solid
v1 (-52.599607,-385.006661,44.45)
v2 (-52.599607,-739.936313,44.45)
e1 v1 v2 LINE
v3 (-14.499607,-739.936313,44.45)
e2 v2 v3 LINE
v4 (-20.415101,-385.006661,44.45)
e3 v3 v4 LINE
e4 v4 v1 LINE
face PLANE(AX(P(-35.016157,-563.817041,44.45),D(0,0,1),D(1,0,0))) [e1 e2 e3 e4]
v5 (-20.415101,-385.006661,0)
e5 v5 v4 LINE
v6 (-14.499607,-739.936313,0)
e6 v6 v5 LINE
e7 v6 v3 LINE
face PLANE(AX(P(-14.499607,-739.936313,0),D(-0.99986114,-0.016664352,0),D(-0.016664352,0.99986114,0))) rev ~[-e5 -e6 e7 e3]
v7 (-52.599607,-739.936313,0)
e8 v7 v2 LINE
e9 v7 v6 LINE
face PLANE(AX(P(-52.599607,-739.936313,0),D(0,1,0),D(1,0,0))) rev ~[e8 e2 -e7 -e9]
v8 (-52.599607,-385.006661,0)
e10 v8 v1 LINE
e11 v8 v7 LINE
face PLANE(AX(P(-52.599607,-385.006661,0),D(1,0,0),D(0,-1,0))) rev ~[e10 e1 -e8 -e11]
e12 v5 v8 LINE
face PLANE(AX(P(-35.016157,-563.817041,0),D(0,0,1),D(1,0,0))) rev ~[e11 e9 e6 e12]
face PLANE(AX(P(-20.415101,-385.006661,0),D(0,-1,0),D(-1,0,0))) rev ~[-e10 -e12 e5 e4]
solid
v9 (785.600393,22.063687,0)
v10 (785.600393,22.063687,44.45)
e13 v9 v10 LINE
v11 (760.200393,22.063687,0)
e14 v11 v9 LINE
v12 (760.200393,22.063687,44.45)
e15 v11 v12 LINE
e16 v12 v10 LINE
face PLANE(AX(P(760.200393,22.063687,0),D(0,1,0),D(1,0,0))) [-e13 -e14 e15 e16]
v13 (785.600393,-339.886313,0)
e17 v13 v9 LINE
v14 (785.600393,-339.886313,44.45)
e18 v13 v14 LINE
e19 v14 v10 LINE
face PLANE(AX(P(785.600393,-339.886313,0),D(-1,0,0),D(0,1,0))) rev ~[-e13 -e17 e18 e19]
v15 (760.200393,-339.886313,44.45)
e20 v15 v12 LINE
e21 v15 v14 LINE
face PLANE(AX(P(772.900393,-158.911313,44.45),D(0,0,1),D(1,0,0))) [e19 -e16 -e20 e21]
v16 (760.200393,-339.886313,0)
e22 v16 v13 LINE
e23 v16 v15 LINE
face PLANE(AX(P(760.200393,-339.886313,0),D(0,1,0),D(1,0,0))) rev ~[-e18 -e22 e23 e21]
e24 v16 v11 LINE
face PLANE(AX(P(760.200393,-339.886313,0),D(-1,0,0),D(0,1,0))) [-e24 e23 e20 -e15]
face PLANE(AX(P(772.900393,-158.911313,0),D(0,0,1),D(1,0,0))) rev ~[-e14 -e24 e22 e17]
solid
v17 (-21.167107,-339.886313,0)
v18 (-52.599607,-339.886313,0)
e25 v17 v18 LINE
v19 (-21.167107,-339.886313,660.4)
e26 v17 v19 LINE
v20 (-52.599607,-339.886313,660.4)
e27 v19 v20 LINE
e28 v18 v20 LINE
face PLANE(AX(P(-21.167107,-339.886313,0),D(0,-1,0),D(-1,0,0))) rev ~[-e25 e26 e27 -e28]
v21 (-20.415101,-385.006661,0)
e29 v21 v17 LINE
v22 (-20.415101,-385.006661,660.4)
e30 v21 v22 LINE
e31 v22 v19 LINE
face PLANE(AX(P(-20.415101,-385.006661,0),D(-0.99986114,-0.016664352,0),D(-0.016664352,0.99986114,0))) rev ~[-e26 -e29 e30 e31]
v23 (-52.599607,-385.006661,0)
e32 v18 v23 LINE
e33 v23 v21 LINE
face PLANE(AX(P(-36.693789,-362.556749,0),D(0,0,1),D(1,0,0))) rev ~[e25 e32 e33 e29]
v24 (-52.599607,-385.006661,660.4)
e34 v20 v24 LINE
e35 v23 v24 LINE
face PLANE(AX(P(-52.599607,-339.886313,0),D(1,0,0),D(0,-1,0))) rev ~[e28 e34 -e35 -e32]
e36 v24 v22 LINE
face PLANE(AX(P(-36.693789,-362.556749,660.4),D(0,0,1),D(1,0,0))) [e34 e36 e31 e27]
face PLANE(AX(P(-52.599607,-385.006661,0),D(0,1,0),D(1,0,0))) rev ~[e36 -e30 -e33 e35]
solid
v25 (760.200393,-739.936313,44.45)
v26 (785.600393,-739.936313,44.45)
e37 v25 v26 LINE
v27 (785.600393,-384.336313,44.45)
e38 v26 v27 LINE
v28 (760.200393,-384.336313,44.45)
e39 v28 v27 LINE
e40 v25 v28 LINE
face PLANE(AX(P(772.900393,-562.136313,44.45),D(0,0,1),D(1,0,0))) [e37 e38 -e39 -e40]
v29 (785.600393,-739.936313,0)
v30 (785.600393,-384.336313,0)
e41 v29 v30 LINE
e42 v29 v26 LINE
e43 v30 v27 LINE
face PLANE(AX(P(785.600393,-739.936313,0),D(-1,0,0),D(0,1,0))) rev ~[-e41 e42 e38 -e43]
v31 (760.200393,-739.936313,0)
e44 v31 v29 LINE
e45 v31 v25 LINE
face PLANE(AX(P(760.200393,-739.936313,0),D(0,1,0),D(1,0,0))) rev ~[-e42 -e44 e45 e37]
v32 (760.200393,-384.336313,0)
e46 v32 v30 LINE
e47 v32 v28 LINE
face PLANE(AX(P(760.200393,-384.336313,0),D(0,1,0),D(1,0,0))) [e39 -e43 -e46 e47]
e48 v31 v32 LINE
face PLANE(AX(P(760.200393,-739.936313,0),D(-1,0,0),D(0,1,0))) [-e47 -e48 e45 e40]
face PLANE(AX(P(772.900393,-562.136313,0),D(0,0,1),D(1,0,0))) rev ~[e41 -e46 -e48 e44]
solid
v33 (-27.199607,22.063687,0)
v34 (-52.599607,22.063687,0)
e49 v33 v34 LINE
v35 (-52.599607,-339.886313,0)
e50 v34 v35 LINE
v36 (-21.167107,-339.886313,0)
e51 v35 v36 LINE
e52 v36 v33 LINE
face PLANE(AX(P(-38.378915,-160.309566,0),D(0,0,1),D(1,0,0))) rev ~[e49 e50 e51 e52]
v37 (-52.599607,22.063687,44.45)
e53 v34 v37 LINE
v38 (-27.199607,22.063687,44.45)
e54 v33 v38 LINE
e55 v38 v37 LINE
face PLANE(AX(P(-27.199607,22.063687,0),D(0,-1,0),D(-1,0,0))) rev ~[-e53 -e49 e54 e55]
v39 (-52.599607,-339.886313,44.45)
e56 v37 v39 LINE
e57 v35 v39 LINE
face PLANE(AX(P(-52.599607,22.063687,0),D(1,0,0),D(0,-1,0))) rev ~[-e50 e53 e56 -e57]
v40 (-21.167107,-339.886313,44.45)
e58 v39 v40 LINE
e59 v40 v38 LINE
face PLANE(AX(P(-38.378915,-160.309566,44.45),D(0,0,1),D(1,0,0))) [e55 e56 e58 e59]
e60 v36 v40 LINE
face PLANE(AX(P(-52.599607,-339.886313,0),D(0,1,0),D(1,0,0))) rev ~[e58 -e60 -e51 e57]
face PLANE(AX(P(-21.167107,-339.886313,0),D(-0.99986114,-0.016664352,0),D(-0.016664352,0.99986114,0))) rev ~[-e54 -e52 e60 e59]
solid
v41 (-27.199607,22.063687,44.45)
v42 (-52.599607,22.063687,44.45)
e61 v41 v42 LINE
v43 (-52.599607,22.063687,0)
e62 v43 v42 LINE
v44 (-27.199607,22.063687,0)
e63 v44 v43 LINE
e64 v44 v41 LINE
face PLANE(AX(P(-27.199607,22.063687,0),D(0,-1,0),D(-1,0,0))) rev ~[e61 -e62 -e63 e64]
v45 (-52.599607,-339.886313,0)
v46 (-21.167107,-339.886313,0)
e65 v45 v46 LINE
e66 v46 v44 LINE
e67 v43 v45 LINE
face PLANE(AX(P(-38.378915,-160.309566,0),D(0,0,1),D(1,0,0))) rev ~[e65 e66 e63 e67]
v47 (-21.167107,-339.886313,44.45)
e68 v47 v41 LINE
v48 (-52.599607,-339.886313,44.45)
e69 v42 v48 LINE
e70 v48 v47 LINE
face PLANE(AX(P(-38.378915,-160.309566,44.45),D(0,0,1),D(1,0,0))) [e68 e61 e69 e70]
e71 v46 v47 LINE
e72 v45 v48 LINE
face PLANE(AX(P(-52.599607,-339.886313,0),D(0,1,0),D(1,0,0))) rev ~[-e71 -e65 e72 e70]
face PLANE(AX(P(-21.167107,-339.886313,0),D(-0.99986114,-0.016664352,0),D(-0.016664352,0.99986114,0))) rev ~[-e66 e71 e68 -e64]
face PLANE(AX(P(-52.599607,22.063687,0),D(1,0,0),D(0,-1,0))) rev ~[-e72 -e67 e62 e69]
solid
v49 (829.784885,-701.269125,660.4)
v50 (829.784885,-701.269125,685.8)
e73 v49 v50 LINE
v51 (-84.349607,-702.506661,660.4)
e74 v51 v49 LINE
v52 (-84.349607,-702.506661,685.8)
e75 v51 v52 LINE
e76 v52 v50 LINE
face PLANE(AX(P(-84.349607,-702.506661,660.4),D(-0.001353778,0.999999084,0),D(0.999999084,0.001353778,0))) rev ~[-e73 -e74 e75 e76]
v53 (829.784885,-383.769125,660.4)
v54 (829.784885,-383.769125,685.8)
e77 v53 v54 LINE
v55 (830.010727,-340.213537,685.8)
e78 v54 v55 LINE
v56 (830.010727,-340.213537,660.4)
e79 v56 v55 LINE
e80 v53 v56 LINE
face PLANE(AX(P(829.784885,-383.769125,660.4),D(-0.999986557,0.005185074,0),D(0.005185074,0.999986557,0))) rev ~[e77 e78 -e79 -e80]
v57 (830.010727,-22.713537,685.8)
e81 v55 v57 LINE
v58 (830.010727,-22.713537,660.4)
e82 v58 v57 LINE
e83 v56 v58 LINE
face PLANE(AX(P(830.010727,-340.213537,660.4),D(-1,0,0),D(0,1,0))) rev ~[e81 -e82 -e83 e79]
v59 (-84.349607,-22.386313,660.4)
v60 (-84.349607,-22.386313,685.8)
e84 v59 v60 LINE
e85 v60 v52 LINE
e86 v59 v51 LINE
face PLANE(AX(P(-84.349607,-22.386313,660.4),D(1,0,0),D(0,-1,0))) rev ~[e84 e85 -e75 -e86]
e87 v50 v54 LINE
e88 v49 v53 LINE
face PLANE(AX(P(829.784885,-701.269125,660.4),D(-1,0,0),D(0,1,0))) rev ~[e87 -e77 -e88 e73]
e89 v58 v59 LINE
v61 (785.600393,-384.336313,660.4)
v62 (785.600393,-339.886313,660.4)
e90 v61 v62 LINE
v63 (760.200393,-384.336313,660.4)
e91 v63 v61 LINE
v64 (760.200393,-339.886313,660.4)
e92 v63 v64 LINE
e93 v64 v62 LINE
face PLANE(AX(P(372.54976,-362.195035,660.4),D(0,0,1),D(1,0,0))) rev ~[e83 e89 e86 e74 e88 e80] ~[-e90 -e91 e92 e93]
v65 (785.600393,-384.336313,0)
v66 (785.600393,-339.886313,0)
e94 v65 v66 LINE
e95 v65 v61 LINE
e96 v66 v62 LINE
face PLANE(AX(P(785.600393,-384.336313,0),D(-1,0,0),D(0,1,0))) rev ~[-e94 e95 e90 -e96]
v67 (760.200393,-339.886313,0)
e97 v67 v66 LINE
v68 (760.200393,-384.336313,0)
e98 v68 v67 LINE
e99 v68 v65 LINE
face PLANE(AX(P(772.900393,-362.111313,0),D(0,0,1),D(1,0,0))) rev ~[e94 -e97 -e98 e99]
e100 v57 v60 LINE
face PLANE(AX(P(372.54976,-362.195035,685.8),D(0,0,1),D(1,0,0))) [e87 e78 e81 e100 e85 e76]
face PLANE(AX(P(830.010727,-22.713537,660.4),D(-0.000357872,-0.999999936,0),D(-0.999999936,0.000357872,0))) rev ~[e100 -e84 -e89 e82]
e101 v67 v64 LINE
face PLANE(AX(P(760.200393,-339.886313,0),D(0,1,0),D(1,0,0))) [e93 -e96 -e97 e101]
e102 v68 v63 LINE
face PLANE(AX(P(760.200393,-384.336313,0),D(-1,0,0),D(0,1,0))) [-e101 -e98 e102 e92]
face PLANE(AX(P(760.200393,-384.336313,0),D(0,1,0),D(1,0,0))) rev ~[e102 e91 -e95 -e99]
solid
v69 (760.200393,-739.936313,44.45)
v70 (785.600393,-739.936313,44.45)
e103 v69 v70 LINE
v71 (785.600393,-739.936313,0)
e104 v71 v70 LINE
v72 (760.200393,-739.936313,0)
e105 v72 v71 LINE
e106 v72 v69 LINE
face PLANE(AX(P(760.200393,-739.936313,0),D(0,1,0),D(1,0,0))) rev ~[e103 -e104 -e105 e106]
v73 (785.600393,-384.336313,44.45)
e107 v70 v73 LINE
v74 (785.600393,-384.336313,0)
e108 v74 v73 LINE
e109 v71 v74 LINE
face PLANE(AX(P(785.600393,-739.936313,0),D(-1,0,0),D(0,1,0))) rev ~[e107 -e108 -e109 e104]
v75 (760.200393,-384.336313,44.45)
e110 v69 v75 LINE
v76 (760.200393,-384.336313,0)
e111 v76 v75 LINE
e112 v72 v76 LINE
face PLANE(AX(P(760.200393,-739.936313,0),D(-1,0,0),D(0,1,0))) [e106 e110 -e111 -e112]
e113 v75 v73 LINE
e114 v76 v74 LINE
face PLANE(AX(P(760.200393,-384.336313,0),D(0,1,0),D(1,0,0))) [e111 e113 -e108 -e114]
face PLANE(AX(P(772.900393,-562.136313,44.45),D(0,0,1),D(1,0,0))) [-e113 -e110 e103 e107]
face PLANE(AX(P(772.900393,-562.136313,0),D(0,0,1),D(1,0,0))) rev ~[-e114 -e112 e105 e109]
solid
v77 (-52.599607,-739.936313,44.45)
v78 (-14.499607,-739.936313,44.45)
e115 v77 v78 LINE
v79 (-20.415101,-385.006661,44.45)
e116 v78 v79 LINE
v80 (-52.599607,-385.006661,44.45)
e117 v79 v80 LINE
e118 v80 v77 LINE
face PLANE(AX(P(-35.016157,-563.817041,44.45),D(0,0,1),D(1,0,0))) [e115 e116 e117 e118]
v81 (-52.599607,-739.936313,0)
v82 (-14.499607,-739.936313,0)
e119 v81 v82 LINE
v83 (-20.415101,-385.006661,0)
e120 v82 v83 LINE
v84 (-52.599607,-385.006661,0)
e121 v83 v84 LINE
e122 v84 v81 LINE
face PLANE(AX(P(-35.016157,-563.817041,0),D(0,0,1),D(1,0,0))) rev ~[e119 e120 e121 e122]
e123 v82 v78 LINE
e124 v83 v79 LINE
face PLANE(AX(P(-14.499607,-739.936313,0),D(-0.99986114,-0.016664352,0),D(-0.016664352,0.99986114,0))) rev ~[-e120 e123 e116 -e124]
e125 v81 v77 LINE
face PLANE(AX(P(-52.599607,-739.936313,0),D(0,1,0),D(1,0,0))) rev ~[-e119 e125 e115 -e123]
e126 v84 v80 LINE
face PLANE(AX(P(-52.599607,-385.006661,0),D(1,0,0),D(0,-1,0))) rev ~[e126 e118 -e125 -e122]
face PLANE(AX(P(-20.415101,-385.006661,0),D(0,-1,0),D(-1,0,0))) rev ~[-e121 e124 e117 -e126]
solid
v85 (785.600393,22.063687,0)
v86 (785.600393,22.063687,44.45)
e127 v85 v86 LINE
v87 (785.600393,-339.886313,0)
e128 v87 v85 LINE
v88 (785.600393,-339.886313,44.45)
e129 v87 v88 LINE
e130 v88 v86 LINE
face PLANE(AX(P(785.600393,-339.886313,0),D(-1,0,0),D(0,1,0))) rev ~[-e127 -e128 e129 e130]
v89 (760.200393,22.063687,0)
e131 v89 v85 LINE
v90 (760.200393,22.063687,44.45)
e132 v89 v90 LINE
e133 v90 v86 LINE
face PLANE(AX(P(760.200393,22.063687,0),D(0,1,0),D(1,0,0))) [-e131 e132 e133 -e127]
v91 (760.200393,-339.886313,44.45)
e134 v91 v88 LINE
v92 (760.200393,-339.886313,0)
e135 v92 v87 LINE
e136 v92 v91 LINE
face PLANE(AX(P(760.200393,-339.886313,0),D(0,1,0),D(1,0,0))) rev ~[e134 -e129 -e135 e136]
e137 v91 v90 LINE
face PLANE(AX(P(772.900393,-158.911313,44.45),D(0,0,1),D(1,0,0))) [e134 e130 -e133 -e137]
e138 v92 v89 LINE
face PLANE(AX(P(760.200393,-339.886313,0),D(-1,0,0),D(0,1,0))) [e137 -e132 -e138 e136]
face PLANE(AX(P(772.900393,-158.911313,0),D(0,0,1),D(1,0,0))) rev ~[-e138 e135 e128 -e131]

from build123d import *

# Parameters (mm, degrees)
F1_DEPTH = 44.45
F0_W     = 25.4
F0_H     = 355.6
F0_H_2   = 361.95
F2_DEPTH = 660.4
F0_H_3   = 44.45
F3_DEPTH = 44.45
F5_DEPTH = 25.4


with BuildPart() as f1:
    # F0 (on Top) → F1 (new body)
    with BuildSketch(Plane.XY):
        Polygon((-20.4151007465, -385.0066614151), (-52.5996065524, -385.0066614151), (-52.5996065524, -739.9363130581), (-14.4996065524, -739.9363130581), align=None)
    extrude(amount=F1_DEPTH)


with BuildPart() as f1b:
    # F0 (on Top) → F1, piece 2 (new body)
    with BuildSketch(Plane.XY):
        with Locations((772.9003934476, -562.1363130581)):
            Rectangle(F0_W, F0_H)
    extrude(amount=F1_DEPTH)


with BuildPart() as f1c:
    # F0 (on Top) → F1, piece 3 (new body)
    with BuildSketch(Plane.XY):
        with Locations((772.9003934476, -158.9113130581)):
            Rectangle(F0_W, F0_H_2)
    extrude(amount=F1_DEPTH)


with BuildPart() as f1d:
    # F0 (on Top) → F1, piece 4 (new body)
    with BuildSketch(Plane.XY):
        Polygon((-27.1996065524, 22.0636869419), (-52.5996065524, 22.0636869419), (-52.5996065524, -339.8863130581), (-21.1671065524, -339.8863130581), align=None)
    extrude(amount=F1_DEPTH)


with BuildPart() as f2:
    # F0 (on Top) → F2 (new body)
    with BuildSketch(Plane.XY):
        Polygon((-21.1671065524, -339.8863130581), (-52.5996065524, -339.8863130581), (-52.5996065524, -385.0066614151), (-20.4151007465, -385.0066614151), align=None)
    extrude(amount=F2_DEPTH)


with BuildPart() as f2b:
    # F0 (on Top) → F2, piece 2 (new body)
    with BuildSketch(Plane.XY):
        with Locations((772.9003934476, -362.1113130581)):
            Rectangle(F0_W, F0_H_3)
    extrude(amount=F2_DEPTH)

    # F4 (on face) → F5 (join)
    with BuildSketch(Plane.XY.offset(660.4)):
        Polygon((-84.3496065524, -339.8863130581), (-84.3496065524, -385.0066614151), (-84.3496065524, -702.5066614151), (829.7848851204, -701.2691247463), (829.7848851204, -383.7691247463), (830.0107271194, -340.2135372162), (830.0107271194, -22.7135372162), (-84.3496065524, -22.3863130581), align=None)
        Polygon((-20.4151007465, -385.0066614151), (-52.5996065524, -385.0066614151), (-52.5996065524, -339.8863130581), (-21.1671065524, -339.8863130581), align=None, mode=Mode.SUBTRACT)
        Polygon((-52.5996065524, -339.8863130581), (-52.5996065524, -385.0066614151), (-20.4151007465, -385.0066614151), (-21.1671065524, -339.8863130581), align=None)
    extrude(amount=F5_DEPTH)


with BuildPart() as f3:
    # F0 (on Top) → F3 (new body)
    with BuildSketch(Plane.XY):
        Polygon((-27.1996065524, 22.0636869419), (-52.5996065524, 22.0636869419), (-52.5996065524, -339.8863130581), (-21.1671065524, -339.8863130581), align=None)
    extrude(amount=F3_DEPTH)


with BuildPart() as f3b:
    # F0 (on Top) → F3, piece 2 (new body)
    with BuildSketch(Plane.XY):
        Polygon((-20.4151007465, -385.0066614151), (-52.5996065524, -385.0066614151), (-52.5996065524, -739.9363130581), (-14.4996065524, -739.9363130581), align=None)
    extrude(amount=F3_DEPTH)


with BuildPart() as f3c:
    # F0 (on Top) → F3, piece 3 (new body)
    with BuildSketch(Plane.XY):
        with Locations((772.9003934476, -158.9113130581)):
            Rectangle(F0_W, F0_H_2)
    extrude(amount=F3_DEPTH)


with BuildPart() as f3d:
    # F0 (on Top) → F3, piece 4 (new body)
    with BuildSketch(Plane.XY):
        with Locations((772.9003934476, -562.1363130581)):
            Rectangle(F0_W, F0_H)
    extrude(amount=F3_DEPTH)


solid = Compound([f1.part, f1b.part, f1c.part, f1d.part, f2.part, f2b.part, f3.part, f3b.part, f3c.part, f3d.part])
